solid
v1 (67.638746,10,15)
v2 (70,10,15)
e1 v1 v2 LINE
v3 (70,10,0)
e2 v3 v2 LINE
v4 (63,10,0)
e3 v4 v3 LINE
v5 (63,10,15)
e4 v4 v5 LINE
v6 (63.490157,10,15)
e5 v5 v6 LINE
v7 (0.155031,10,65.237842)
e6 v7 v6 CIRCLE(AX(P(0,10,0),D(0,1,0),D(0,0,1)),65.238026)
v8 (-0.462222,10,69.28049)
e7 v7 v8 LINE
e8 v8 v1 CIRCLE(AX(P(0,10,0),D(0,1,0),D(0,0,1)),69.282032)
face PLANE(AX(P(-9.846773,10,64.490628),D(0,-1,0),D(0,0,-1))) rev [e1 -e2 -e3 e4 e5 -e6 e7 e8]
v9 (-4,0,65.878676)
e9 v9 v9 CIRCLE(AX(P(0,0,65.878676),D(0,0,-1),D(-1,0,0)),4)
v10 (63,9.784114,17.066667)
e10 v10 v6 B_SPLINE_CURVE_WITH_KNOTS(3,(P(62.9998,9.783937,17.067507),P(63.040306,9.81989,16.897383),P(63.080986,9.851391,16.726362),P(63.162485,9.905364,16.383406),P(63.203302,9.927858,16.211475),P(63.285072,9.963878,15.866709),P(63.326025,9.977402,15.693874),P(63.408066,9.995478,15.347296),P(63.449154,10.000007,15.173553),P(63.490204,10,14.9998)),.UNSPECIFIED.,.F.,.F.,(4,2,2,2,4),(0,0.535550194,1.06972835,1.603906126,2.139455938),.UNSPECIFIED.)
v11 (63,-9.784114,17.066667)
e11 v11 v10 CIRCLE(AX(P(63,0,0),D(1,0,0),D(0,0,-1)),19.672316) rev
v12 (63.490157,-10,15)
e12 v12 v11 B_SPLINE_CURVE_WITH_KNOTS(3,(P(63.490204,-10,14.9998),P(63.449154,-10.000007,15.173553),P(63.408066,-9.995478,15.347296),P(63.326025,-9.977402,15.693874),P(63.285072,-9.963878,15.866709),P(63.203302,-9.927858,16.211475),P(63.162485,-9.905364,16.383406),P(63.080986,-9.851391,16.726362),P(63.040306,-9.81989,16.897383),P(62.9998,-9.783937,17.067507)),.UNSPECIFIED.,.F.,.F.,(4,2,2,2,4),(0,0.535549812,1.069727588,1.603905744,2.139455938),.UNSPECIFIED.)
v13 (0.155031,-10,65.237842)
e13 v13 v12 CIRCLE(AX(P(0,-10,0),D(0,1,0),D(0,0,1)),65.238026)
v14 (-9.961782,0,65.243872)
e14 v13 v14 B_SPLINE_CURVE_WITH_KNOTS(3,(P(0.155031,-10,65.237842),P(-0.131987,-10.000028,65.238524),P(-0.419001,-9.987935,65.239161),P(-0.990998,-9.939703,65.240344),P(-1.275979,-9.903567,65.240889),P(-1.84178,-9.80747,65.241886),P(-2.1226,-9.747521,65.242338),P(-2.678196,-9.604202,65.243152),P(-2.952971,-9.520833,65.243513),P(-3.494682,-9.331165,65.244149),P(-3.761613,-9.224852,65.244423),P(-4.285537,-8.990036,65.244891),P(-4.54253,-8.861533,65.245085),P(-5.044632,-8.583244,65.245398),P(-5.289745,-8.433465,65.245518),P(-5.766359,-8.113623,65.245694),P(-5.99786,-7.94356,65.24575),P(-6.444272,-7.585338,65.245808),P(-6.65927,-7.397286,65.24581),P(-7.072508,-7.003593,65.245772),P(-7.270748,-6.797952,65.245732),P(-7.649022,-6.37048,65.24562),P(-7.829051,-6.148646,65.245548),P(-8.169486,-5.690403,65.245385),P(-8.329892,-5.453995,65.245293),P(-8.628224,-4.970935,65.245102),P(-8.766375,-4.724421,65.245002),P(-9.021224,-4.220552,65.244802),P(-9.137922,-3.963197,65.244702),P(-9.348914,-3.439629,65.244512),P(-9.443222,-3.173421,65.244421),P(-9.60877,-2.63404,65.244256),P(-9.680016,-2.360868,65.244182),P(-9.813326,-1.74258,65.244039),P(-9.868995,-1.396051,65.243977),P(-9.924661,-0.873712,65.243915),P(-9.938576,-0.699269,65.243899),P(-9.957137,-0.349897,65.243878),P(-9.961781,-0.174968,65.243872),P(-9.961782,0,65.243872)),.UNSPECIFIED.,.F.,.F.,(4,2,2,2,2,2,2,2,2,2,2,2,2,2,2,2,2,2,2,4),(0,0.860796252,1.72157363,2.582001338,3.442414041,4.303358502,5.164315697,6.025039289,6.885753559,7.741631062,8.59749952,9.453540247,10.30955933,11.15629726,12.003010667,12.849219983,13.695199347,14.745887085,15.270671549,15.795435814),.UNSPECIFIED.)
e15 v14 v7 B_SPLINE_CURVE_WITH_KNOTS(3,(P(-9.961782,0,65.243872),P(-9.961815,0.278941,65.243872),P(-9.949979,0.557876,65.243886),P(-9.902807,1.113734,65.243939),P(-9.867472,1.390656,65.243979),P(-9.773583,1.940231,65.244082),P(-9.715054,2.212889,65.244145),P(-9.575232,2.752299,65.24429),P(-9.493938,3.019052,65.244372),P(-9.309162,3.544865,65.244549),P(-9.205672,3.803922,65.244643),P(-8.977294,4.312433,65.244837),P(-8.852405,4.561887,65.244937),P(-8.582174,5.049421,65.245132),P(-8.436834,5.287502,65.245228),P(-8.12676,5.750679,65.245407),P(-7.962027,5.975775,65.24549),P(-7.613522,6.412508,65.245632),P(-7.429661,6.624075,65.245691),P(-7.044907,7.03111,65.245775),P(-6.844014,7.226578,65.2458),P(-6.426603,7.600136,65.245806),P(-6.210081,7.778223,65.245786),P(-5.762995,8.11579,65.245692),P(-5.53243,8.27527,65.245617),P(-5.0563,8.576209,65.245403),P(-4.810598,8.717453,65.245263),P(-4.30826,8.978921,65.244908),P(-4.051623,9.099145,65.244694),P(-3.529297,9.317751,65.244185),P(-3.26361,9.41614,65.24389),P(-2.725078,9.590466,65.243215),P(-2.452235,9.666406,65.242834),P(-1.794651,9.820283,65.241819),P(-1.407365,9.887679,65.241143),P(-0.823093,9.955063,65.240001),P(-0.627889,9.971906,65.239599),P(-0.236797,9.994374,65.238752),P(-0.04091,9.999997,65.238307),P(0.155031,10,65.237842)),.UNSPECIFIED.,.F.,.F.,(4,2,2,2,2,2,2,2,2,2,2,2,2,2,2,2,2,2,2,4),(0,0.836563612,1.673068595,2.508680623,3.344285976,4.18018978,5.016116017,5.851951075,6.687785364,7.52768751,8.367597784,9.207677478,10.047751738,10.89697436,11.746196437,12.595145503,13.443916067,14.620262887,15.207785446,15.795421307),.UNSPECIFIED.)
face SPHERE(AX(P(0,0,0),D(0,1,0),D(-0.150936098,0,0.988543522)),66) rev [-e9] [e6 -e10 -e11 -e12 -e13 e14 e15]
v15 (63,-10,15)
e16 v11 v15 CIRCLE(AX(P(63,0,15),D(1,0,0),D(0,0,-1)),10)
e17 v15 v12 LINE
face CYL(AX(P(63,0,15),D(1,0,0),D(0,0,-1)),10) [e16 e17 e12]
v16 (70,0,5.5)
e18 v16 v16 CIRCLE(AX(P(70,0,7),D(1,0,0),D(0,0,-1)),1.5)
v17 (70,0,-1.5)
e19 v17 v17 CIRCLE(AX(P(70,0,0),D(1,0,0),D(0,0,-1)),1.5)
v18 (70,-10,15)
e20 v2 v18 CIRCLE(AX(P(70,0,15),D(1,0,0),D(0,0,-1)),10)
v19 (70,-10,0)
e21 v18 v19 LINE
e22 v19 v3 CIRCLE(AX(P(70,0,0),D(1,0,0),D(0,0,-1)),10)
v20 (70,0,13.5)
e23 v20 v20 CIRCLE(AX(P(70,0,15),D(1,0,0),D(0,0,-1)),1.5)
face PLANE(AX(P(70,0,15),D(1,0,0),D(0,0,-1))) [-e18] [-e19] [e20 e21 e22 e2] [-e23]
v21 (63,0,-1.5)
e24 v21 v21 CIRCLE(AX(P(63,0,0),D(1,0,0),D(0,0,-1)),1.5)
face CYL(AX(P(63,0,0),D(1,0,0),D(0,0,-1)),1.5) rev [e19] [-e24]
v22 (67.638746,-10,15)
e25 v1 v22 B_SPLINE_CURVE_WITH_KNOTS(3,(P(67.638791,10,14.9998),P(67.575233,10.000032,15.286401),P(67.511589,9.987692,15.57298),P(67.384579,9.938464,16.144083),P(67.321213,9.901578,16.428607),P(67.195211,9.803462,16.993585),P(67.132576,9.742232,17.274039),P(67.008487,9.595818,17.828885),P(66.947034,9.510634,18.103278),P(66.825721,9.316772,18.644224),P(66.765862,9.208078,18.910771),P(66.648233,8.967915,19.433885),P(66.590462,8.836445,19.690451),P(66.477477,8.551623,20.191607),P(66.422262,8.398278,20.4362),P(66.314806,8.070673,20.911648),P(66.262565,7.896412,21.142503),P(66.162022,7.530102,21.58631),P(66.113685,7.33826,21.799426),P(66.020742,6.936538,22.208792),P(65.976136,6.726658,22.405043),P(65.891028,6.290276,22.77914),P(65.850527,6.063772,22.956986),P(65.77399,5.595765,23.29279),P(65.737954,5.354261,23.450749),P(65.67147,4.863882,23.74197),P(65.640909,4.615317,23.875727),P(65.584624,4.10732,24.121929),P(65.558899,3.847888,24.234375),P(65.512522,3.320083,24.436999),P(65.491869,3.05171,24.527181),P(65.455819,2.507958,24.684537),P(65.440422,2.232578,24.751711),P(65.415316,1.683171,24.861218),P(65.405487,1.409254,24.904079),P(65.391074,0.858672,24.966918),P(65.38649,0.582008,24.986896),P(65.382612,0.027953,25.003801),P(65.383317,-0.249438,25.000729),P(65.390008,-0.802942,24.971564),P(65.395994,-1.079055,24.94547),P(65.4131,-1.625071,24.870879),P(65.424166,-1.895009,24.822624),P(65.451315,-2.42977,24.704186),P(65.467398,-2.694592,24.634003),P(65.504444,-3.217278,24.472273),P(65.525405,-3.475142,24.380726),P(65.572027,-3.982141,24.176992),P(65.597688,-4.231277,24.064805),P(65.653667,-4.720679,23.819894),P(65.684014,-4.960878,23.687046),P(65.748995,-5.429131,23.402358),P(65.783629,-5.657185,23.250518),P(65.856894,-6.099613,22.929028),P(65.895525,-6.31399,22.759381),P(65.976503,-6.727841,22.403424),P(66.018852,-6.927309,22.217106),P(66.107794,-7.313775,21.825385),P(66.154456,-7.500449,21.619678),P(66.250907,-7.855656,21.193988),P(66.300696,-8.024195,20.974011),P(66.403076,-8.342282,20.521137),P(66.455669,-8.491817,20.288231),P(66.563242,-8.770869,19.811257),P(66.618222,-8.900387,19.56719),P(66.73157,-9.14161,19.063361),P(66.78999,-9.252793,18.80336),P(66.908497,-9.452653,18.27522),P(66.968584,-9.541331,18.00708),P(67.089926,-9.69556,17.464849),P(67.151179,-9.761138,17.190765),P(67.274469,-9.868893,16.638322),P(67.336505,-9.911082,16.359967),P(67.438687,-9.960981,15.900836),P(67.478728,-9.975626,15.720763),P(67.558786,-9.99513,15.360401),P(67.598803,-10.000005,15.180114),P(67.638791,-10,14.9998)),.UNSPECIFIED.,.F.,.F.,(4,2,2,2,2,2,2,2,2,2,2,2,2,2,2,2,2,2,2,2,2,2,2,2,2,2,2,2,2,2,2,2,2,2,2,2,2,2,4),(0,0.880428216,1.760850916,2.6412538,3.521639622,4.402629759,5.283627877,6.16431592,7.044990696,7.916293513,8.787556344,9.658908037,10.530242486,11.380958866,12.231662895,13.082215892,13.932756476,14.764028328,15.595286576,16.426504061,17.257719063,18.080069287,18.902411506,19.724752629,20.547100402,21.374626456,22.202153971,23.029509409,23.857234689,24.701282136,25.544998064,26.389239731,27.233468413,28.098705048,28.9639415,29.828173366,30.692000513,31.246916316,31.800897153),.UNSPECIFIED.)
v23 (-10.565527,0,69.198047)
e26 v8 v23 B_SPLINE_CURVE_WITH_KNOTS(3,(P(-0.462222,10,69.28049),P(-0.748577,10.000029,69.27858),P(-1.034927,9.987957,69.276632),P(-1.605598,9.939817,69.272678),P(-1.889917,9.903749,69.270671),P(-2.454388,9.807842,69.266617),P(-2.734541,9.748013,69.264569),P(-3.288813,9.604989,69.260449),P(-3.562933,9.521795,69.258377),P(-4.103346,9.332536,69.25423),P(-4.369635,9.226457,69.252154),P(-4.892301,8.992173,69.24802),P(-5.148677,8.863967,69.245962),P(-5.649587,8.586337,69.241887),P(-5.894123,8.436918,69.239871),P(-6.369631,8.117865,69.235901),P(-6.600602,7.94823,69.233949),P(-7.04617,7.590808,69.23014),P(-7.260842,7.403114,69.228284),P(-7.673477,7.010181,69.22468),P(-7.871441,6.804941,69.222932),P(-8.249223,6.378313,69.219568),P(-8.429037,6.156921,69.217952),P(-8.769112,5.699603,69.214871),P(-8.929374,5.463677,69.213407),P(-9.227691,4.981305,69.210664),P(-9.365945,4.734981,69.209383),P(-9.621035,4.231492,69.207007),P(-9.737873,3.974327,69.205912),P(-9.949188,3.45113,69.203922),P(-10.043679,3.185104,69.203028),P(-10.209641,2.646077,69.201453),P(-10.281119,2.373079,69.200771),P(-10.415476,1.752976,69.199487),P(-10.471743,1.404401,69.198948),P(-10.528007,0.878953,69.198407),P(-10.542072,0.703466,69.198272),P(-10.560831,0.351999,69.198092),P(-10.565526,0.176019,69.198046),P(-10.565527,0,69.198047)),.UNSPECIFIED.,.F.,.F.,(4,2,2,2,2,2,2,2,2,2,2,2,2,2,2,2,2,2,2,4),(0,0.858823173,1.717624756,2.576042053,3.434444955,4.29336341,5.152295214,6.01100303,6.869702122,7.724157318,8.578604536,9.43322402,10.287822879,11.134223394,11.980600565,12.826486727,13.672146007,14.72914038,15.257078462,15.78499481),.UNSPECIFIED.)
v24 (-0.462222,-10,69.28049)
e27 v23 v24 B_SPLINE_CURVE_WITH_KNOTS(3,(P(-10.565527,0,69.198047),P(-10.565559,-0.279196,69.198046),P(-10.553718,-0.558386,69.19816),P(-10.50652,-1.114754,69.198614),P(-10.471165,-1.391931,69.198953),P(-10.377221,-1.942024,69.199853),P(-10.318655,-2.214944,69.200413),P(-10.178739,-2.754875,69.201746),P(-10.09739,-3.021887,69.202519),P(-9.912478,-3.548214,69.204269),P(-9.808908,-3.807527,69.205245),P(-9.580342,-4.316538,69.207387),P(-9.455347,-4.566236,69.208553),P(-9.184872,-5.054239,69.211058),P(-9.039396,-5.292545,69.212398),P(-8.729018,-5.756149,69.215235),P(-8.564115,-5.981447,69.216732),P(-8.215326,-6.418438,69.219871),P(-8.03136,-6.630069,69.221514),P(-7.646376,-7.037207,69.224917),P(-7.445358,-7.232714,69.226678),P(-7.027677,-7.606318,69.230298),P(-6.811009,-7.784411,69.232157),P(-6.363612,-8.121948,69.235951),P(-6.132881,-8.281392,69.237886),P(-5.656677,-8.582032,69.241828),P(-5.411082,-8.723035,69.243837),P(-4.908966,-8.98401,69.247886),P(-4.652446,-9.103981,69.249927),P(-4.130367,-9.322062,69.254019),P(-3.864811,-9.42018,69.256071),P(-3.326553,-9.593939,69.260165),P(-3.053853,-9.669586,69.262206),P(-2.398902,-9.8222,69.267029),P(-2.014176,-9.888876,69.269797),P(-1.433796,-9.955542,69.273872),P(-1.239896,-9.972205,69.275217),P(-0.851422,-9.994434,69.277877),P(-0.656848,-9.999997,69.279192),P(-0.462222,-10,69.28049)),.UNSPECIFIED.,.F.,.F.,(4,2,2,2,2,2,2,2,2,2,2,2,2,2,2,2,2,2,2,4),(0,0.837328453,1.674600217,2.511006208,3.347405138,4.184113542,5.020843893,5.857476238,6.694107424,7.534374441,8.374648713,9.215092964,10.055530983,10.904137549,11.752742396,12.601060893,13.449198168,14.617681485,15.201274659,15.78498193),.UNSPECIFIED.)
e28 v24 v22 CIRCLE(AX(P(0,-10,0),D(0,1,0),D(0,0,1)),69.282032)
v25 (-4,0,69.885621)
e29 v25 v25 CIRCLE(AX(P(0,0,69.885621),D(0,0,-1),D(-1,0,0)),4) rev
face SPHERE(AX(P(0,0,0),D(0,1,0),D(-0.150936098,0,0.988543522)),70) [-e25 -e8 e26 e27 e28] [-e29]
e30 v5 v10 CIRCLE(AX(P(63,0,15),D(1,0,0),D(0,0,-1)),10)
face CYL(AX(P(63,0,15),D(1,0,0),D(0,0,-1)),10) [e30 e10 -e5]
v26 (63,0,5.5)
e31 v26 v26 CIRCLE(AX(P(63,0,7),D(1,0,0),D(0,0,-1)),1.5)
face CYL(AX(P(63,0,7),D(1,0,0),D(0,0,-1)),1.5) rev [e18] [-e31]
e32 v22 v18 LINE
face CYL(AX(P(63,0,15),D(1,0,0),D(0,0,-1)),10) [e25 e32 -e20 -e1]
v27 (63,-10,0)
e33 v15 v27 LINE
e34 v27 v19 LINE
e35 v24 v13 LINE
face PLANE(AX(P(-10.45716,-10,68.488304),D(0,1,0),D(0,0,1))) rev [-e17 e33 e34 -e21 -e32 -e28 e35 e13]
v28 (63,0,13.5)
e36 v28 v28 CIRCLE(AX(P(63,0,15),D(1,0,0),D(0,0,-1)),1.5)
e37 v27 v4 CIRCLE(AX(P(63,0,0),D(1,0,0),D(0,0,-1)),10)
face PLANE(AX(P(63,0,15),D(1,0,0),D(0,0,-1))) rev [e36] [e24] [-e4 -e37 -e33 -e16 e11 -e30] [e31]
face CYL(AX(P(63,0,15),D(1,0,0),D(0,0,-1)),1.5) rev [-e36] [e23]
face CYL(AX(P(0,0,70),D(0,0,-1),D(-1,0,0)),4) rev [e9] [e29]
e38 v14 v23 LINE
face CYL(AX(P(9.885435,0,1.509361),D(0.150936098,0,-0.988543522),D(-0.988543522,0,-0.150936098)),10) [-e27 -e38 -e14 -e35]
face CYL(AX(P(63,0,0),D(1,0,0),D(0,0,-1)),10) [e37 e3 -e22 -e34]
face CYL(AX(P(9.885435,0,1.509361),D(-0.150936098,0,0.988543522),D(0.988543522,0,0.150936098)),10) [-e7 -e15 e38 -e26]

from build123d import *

# Parameters (mm, degrees)
REVOLVE_1_ANGLE           = 98.68117871
REVOLVE_1_OTHER_WAY_ANGLE = 8.68117871
SKETCH_3_R                = 4
CUT_EXTRUDE_1_DEPTH       = 100.498743711
SKETCH_4_R                = 1.5
CUT_EXTRUDE_2_DEPTH       = 100.41830825
CUT_EXTRUDE_3_DEPTH       = 102.960221512
FILLET_1_R                = 10
EXTRUDE_START             = -7
SKETCH_8_R                = 1.5
EXTRUDE_1_DEPTH           = 7


with BuildPart() as part:
    # 草图2 → 旋转1 (revolve)
    with BuildSketch(Plane.XY):
        with BuildLine():
            Line((65.238025721, 10), (69.282032303, 10))
            ThreePointArc((69.282032303, 10), (70, 0), (69.282032303, -10))
            Line((69.282032303, -10), (65.238025721, -10))
            ThreePointArc((65.238025721, -10), (66, 0), (65.238025721, 10))
        make_face()
    revolve(axis=Axis((0, 0, 0), (0, -1, 0)), revolution_arc=REVOLVE_1_ANGLE)

    # 草图2 → 旋转1 other way (revolve)
    with BuildSketch(Plane.XY):
        with BuildLine():
            Line((65.238025721, 10), (69.282032303, 10))
            ThreePointArc((69.282032303, 10), (70, 0), (69.282032303, -10))
            Line((69.282032303, -10), (65.238025721, -10))
            ThreePointArc((65.238025721, -10), (66, 0), (65.238025721, 10))
        make_face()
    revolve(axis=Axis((0, 0, 0), (0, 1, 0)), revolution_arc=REVOLVE_1_OTHER_WAY_ANGLE)

    # 草图3 → 切除-拉伸1 (cut, through all)
    with BuildSketch(Plane.XY):
        with Locations(Location((0, 0, 0), (0, 0, 180))):
            Circle(SKETCH_3_R)
    extrude(amount=CUT_EXTRUDE_1_DEPTH, mode=Mode.SUBTRACT)

    # 草图4 → 切除-拉伸2 (cut, through all)
    with BuildSketch(Plane(origin=(0, 0, 0), x_dir=(0, 0, -1), z_dir=(1, 0, 0))):
        with Locations(Location((0, 0, 0), (0, 0, 180))):
            Circle(SKETCH_4_R)
    extrude(amount=CUT_EXTRUDE_2_DEPTH, mode=Mode.SUBTRACT)

    # 草图7 → 切除-拉伸3 (cut, through all)
    with BuildSketch(Plane(origin=(63, 0, 0), x_dir=(0, 0, -1), z_dir=(1, 0, 0))):
        with BuildLine():
            Line((25, -10), (-15, -10))
            ThreePointArc((-15, -10), (-25, 0), (-15, 10))
            Line((-15, 10), (25, 10))
            Line((25, 10), (25, -10))
        make_face()
    extrude(amount=CUT_EXTRUDE_3_DEPTH, mode=Mode.SUBTRACT)

    # 圆角1
    # the kernel refuses this fillet: 10 mm, written as the material it takes off along each edge
    with BuildSketch(Plane(origin=(-6.073370605, 10, 39.777039651), x_dir=(0.9885435216678339, 0, 0.15093609829512958), z_dir=(-0.15093609829512958, 0, 0.9885435216678339)), Plane(origin=(-14.230562095, -10, 93.201892243), x_dir=(0.9885435216678339, 0, 0.15093609829512958), z_dir=(0.15093609829512958, 0, -0.9885435216678339))) as fillet_1_piece_1:
        with BuildLine():
            CenterArc((FILLET_1_R, -FILLET_1_R), FILLET_1_R, 90, 90)
            Line((0, -FILLET_1_R), (0, 0))
            Line((0, 0), (FILLET_1_R, 0))
        make_face()
    extrude(amount=54.044006582, mode=Mode.SUBTRACT)

    # 草图8 → 凸台-拉伸1 (add)
    with BuildSketch(Plane(origin=(70, 0, 0), x_dir=(0, 0, -1), z_dir=(1, 0, 0)).offset(EXTRUDE_START)):
        with BuildLine():
            Line((-15, 10), (0, 10))
            ThreePointArc((0, 10), (10, 0), (0, -10))
            Line((0, -10), (-15, -10))
            ThreePointArc((-15, -10), (-25, 0), (-15, 10))
        make_face()
        Circle(SKETCH_8_R, mode=Mode.SUBTRACT)
        with Locations((-7, 0)):
            Circle(SKETCH_8_R, mode=Mode.SUBTRACT)
        with Locations((-15, 0)):
            Circle(SKETCH_8_R, mode=Mode.SUBTRACT)
    extrude(amount=EXTRUDE_1_DEPTH)


solid = part.part
